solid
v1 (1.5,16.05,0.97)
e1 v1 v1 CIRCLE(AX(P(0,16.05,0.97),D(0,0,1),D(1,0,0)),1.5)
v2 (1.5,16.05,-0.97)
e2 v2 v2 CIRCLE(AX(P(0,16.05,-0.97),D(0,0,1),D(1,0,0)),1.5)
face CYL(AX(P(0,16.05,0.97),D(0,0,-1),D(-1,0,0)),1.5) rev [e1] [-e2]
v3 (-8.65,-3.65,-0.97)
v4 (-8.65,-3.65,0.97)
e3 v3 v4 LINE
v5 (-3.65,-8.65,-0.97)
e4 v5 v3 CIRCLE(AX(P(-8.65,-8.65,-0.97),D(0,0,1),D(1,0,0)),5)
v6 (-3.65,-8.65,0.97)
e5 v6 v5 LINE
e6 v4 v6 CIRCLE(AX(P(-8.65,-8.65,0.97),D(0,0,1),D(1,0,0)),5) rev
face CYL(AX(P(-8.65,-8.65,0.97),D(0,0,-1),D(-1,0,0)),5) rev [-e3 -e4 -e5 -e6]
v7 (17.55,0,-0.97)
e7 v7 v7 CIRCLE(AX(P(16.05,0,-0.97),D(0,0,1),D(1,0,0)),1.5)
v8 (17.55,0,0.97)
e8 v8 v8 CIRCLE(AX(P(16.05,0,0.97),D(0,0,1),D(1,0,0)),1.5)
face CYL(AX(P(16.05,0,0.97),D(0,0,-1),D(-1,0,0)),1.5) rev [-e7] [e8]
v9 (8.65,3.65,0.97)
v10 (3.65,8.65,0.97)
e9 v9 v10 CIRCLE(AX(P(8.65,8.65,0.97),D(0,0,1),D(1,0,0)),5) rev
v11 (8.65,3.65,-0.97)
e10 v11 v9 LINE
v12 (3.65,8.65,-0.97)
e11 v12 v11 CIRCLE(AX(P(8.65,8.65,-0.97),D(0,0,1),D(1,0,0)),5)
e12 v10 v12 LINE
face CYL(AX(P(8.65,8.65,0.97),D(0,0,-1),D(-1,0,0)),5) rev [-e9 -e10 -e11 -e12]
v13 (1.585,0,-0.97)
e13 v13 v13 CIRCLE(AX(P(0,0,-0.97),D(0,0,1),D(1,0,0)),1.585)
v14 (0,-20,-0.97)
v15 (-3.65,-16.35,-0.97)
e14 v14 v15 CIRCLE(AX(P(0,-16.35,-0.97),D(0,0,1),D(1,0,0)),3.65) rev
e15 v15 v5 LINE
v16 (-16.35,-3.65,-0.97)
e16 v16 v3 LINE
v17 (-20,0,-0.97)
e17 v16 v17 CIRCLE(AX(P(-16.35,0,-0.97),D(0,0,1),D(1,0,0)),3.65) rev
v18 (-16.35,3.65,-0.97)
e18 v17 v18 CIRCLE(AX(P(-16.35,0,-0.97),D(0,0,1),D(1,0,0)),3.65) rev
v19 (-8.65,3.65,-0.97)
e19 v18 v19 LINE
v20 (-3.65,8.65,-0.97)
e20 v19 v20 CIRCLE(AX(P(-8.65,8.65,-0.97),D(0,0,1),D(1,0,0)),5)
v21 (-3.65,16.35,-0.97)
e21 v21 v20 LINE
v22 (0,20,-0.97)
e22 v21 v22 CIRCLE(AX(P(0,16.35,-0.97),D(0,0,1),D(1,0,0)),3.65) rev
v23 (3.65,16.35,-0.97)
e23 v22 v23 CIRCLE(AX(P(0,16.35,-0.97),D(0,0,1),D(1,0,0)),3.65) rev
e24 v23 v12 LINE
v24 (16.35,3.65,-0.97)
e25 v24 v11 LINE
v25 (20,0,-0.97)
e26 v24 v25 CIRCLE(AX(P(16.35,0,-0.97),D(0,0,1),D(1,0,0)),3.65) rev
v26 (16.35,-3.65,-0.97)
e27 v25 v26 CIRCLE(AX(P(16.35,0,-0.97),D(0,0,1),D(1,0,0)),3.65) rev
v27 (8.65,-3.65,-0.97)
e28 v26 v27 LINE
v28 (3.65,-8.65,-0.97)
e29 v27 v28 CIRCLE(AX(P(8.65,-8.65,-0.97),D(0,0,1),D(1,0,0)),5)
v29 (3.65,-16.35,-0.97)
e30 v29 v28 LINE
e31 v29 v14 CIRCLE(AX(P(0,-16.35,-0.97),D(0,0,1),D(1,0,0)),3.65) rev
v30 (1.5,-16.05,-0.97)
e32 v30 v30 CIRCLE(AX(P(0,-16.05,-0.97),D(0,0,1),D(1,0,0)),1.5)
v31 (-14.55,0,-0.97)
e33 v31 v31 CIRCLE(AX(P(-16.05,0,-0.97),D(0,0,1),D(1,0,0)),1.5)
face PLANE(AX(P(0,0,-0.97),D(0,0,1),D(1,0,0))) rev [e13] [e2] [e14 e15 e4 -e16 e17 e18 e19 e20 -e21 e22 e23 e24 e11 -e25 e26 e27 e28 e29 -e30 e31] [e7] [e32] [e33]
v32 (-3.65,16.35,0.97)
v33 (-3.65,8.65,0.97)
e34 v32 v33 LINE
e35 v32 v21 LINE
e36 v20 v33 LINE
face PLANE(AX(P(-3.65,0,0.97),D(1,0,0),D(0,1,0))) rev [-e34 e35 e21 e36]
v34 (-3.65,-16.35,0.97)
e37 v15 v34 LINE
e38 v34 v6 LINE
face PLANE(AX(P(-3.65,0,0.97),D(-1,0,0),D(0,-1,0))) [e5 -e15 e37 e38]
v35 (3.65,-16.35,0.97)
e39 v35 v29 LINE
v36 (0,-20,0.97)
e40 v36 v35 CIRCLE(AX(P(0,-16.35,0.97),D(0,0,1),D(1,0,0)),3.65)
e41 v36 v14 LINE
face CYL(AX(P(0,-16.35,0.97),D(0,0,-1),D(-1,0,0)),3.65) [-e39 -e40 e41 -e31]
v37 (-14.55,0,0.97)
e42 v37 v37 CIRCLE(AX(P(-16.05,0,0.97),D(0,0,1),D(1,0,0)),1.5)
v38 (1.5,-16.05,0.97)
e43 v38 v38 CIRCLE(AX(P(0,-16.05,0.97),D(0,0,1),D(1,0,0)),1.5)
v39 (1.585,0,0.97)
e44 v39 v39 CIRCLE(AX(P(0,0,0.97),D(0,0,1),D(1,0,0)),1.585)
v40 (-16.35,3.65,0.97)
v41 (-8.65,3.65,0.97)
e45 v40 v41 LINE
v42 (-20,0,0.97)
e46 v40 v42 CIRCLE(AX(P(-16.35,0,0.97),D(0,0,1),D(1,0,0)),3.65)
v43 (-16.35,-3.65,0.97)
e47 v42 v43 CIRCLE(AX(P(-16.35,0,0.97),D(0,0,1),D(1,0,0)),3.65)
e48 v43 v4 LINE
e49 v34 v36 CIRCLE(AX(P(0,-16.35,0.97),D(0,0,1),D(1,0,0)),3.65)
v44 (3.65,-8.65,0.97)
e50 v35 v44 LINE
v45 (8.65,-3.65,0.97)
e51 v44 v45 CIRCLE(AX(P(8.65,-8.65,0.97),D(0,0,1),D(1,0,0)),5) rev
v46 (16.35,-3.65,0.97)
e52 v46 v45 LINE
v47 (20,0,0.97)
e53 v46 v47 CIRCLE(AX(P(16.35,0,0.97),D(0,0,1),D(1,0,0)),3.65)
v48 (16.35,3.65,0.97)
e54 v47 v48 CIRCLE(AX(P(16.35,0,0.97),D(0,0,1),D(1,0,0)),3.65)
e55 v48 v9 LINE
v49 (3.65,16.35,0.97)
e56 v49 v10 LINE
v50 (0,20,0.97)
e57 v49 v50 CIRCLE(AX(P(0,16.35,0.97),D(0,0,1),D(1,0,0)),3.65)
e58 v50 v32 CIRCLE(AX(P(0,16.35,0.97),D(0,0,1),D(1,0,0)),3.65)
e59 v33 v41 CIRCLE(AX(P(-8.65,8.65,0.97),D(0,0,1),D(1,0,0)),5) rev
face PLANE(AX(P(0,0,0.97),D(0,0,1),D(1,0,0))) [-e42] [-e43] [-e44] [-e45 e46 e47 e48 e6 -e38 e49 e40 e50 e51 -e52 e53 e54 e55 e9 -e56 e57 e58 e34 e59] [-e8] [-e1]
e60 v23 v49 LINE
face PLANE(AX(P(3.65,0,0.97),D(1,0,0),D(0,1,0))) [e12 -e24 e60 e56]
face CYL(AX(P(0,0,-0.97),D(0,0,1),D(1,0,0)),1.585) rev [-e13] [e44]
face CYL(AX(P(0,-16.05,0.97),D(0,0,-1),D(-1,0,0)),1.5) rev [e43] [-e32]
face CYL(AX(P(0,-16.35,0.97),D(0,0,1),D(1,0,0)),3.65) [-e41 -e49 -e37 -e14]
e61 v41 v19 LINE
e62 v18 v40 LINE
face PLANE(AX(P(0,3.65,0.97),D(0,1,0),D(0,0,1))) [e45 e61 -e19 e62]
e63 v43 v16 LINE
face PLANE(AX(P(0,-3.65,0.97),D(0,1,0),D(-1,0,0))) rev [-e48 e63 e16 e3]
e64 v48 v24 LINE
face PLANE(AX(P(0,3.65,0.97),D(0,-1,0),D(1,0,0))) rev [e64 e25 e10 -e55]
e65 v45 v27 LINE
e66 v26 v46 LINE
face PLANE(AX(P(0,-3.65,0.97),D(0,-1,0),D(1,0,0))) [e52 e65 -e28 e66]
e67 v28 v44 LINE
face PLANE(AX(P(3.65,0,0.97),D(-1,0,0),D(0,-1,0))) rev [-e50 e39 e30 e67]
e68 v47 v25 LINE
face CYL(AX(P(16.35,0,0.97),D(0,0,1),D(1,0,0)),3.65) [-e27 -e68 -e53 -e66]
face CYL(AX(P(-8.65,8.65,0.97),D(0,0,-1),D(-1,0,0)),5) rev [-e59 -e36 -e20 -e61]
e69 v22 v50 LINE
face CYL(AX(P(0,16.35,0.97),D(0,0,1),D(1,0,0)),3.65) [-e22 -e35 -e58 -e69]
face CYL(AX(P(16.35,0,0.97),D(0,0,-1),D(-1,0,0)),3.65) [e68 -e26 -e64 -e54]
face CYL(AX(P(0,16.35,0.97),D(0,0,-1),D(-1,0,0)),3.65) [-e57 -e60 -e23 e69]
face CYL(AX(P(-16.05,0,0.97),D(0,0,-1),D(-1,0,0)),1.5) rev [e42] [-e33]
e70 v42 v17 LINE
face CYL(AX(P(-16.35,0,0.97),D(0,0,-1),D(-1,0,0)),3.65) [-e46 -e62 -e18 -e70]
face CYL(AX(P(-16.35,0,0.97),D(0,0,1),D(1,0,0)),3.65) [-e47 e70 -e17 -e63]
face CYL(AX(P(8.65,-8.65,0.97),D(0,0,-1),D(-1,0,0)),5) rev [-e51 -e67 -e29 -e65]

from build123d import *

# Parameters (mm, degrees)
SKETCH2_R           = 1.5
BOSS_EXTRUDE1_DEPTH = 0.97
FILLET1_R           = 3.65
FILLET2_R           = 5
SKETCH3_R           = 1.585
CUT_EXTRUDE1_DEPTH  = 29.350724858


with BuildPart() as part:
    # Sketch2 → Boss-Extrude1 (new, symmetric)
    with BuildSketch(Plane.XY):
        Polygon((-3.65, -3.65), (-3.65, -20), (3.65, -20), (3.65, -3.65), (20, -3.65), (20, 3.65), (3.65, 3.65), (3.65, 20), (-3.65, 20), (-3.65, 3.65), (-20, 3.65), (-20, -3.65), align=None)
        with Locations((-16.05, 0)):
            Circle(SKETCH2_R, mode=Mode.SUBTRACT)
        with Locations((0, -16.05)):
            Circle(SKETCH2_R, mode=Mode.SUBTRACT)
        with Locations((16.05, 0)):
            Circle(SKETCH2_R, mode=Mode.SUBTRACT)
        with Locations((0, 16.05)):
            Circle(SKETCH2_R, mode=Mode.SUBTRACT)
    extrude(amount=BOSS_EXTRUDE1_DEPTH, both=True)

    # Fillet1
    fillet1_edges = [part.edges().sort_by_distance(p)[0] for p in [
        (20, 3.65, 0),
        (20, -3.65, 0),
        (3.65, -20, 0),
        (-3.65, -20, 0),
        (-20, -3.65, 0),
        (-20, 3.65, 0),
        (3.65, 20, 0),
        (-3.65, 20, 0),
    ]]
    fillet(fillet1_edges, radius=FILLET1_R - 0.0001)  # a hair under: the kernel refuses the full size

    # Fillet2
    fillet2_edges = [part.edges().sort_by_distance(p)[0] for p in [
        (-3.65, -3.65, 0),
        (-3.65, 3.65, 0),
        (3.65, 3.65, 0),
        (3.65, -3.65, 0),
    ]]
    fillet(fillet2_edges, radius=FILLET2_R)

    # Sketch3 → Cut-Extrude1 (cut, through all)
    with BuildSketch(Plane.XY.offset(0.97)):
        Circle(SKETCH3_R)
    extrude(amount=-CUT_EXTRUDE1_DEPTH, mode=Mode.SUBTRACT)


solid = part.part
